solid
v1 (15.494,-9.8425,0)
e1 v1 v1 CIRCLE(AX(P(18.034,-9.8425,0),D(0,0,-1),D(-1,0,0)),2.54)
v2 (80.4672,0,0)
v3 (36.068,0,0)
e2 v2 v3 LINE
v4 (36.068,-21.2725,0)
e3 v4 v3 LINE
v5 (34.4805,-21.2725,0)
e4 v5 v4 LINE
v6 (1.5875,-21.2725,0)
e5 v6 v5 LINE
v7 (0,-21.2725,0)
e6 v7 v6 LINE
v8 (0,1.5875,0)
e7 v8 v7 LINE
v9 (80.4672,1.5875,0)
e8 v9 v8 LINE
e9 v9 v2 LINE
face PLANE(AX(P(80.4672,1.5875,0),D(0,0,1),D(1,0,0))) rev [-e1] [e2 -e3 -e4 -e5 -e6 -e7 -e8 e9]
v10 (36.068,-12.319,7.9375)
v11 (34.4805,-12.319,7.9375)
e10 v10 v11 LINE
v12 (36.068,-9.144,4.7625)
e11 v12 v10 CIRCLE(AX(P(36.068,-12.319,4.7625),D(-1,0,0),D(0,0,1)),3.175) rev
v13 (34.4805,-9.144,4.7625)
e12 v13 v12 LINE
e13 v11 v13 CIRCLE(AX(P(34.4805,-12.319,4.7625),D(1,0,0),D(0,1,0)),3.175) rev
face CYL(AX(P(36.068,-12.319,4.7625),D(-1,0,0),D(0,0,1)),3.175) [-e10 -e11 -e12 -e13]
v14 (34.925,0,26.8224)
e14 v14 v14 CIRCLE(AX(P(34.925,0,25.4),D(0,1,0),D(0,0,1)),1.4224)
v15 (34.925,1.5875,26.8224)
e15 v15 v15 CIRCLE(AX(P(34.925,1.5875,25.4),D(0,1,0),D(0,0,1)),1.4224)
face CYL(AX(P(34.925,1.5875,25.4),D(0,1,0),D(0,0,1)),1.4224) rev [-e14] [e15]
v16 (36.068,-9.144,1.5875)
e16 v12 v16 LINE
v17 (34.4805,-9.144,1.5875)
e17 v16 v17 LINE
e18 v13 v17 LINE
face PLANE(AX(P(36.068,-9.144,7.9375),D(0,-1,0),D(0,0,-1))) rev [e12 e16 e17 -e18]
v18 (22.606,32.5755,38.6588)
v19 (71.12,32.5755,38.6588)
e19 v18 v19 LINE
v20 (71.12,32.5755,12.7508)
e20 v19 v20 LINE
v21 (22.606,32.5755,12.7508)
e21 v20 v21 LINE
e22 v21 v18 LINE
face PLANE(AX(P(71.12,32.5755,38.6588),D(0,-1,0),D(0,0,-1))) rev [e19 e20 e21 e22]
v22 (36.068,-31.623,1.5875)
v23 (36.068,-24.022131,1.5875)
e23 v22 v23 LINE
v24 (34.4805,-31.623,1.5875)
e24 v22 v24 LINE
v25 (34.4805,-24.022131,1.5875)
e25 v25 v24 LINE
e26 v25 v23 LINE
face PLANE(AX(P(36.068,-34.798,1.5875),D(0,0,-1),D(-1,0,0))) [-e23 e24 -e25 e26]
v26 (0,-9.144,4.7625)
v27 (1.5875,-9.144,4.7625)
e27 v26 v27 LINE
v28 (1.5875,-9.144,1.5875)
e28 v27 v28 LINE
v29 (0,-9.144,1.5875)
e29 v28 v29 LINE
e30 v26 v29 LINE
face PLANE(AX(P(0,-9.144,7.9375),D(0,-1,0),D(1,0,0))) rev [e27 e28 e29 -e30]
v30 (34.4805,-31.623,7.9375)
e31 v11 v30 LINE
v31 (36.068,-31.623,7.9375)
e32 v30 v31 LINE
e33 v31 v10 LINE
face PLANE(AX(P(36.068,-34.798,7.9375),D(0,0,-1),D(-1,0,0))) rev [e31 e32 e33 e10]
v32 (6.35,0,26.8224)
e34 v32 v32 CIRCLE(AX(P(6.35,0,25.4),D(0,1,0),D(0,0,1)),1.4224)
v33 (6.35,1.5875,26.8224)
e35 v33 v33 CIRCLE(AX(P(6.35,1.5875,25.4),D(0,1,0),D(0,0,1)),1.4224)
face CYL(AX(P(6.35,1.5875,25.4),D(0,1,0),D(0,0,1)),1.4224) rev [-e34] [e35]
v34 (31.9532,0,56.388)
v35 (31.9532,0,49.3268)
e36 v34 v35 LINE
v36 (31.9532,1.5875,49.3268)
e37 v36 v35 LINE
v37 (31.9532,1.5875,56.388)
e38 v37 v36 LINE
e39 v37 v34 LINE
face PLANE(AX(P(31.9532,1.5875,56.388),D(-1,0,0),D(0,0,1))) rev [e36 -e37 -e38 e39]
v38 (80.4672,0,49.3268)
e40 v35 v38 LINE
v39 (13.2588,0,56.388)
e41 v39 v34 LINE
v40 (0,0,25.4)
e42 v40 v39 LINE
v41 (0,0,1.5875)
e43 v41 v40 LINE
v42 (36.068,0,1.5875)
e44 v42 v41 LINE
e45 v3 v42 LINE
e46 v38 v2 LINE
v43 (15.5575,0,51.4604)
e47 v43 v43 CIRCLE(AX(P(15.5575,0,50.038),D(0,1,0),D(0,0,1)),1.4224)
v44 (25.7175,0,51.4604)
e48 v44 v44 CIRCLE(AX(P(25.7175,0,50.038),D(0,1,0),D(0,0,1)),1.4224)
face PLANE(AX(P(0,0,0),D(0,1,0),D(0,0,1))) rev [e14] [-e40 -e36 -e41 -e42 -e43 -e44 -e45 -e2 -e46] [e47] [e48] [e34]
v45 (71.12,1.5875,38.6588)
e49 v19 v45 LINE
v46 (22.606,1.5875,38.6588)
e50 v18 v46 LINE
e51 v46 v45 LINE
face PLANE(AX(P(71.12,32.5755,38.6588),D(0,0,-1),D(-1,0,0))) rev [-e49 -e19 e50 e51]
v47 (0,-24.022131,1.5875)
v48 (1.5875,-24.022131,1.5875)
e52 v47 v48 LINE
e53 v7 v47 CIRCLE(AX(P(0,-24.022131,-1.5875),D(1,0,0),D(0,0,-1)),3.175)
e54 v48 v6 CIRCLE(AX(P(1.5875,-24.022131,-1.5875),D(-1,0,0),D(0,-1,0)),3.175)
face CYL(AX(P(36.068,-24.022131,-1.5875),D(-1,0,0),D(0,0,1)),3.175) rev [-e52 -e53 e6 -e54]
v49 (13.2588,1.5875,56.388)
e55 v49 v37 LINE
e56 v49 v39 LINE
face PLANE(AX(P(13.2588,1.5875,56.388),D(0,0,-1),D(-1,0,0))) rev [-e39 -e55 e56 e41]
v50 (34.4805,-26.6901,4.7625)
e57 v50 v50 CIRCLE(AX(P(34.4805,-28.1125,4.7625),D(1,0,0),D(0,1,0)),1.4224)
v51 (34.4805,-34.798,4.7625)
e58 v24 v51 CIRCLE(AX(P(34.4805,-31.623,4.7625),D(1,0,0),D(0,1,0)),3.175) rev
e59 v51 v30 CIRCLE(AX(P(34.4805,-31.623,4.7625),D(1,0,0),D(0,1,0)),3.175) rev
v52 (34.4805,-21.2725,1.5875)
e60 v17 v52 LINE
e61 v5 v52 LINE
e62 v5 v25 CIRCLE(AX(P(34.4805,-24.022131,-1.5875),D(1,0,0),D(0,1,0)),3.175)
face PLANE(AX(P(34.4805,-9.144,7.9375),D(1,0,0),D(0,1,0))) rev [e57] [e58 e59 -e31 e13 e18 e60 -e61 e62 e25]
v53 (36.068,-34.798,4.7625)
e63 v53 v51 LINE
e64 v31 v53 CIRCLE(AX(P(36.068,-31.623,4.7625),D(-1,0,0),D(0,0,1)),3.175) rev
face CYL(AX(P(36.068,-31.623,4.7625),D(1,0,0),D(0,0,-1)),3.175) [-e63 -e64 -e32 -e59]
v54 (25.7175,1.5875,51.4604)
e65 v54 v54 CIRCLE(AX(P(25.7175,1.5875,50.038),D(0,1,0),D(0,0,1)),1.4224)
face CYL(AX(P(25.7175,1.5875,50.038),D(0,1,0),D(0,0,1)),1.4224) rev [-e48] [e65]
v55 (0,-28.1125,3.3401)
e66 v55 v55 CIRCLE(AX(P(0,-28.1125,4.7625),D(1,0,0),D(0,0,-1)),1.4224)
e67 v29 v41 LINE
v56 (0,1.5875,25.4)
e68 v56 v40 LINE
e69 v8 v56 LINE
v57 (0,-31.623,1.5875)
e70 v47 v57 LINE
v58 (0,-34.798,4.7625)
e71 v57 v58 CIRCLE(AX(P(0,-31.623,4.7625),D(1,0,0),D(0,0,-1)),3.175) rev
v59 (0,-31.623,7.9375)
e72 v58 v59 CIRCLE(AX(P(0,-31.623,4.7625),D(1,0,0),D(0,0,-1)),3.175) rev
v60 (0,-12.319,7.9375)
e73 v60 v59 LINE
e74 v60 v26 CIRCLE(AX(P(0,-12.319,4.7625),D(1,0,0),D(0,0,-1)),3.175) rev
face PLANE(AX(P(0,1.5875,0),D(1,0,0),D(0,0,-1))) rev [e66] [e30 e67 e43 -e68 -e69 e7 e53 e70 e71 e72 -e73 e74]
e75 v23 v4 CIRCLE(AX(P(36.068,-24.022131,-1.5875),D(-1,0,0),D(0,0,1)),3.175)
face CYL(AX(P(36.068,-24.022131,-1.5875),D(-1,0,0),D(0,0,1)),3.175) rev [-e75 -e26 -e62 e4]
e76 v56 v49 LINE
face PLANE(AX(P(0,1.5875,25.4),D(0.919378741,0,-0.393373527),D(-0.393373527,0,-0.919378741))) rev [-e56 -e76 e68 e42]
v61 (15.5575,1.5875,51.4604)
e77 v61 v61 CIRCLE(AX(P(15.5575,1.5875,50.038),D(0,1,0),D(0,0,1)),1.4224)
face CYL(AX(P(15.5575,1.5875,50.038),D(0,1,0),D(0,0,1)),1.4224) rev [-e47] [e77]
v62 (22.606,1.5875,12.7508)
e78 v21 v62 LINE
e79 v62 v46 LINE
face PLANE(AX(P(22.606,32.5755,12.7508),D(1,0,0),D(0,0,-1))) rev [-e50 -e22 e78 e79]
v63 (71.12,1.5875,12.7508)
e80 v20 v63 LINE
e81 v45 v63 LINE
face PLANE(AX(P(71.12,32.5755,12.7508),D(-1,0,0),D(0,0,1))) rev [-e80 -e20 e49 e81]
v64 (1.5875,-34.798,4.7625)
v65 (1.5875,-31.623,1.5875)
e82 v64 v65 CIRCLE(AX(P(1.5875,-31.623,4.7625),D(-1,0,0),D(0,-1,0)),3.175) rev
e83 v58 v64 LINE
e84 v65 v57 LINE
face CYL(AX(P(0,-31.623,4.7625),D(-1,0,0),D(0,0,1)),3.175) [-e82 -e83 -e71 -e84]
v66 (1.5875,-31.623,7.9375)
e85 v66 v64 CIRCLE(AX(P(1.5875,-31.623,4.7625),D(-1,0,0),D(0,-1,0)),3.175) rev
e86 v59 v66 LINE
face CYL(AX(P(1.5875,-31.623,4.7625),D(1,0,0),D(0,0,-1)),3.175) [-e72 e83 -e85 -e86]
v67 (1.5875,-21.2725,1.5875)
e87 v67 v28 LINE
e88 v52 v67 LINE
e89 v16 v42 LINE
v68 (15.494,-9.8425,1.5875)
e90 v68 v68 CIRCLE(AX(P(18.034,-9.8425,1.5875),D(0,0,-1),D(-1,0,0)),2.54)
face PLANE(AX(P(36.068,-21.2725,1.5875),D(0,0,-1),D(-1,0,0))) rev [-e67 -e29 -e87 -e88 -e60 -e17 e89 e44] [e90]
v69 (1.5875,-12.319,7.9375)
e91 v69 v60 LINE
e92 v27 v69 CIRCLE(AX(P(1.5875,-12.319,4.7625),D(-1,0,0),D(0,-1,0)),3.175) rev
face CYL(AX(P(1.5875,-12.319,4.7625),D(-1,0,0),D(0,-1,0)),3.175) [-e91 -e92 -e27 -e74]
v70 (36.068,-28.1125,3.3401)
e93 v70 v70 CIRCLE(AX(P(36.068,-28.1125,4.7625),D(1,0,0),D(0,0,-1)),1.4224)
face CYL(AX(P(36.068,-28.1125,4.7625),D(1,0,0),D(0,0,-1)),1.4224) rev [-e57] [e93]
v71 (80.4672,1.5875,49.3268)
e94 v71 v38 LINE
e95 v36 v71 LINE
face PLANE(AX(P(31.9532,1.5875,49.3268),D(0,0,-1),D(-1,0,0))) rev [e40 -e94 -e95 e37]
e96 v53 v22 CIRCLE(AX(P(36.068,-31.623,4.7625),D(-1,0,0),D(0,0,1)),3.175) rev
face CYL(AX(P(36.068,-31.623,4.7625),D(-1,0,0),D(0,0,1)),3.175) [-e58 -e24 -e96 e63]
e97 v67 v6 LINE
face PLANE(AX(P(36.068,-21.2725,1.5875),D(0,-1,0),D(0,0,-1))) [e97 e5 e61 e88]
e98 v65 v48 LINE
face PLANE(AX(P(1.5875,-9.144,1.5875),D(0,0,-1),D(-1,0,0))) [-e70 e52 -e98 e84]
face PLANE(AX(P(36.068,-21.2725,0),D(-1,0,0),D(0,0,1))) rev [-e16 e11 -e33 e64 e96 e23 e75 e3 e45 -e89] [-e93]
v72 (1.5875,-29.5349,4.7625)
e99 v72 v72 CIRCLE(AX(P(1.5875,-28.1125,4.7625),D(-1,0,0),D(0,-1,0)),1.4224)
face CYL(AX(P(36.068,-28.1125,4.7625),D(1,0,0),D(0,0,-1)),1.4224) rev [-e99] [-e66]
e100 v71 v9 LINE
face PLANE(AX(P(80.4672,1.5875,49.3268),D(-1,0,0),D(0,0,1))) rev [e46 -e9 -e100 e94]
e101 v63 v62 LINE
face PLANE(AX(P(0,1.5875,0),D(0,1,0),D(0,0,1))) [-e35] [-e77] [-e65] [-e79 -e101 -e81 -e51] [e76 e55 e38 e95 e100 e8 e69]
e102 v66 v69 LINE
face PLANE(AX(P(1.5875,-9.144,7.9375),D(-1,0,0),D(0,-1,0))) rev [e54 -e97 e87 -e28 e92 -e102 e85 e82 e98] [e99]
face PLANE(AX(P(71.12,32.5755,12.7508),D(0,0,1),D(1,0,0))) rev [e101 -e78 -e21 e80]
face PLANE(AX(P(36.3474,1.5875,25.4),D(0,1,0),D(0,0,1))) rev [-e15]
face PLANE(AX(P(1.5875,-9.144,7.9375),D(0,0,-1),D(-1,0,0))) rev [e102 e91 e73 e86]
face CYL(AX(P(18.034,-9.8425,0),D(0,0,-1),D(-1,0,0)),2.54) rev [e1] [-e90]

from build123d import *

# Parameters (mm, degrees)
BOSS_EXTRUDE1_DEPTH = 1.5875
SKETCH2_W           = 36.068
SKETCH2_H           = 1.5875
BOSS_EXTRUDE2_DEPTH = 21.2725
SKETCH3_W           = 1.5875
SKETCH3_H           = 25.654
BOSS_EXTRUDE3_DEPTH = 6.35
FILLET1_R           = 3.175
HOLE1_D             = 5.08
HOLE1_DEPTH         = 15.875
HOLE2_D             = 2.8448
SKETCH9_W           = 48.514
SKETCH9_H           = 25.908
BOSS_EXTRUDE4_DEPTH = 30.988
HOLE3_D             = 2.8448
LPATTERN1_COUNT     = 2
LPATTERN1_PITCH     = 10.16
SKETCH12_W          = 1.4224
SKETCH12_H          = 36.3855
LPATTERN2_COUNT     = 2
LPATTERN2_PITCH     = 28.575


with BuildPart() as part:
    # Sketch1 → Boss-Extrude1 (new body)
    with BuildSketch(Plane(origin=(0, 0, 0), x_dir=(1, 0, 0), z_dir=(0, 1, 0))):
        Polygon((0, 0), (0, -25.4), (13.2588, -56.388), (31.9532, -56.388), (31.9532, -49.3268), (80.4672, -49.3268), (80.4672, 0), align=None)
    extrude(amount=BOSS_EXTRUDE1_DEPTH)

    # Sketch2 → Boss-Extrude2 (add)
    with BuildSketch(Plane.XZ):
        with Locations((18.034, 0.79375)):
            Rectangle(SKETCH2_W, SKETCH2_H)
    extrude(amount=BOSS_EXTRUDE2_DEPTH)

    # Sketch3 → Boss-Extrude3 (add)
    with BuildSketch(Plane.XY.offset(1.5875)):
        with Locations((35.27425, -21.971)):
            Rectangle(SKETCH3_W, SKETCH3_H)
        with Locations((0.79375, -21.971)):
            Rectangle(SKETCH3_W, SKETCH3_H)
    extrude(amount=BOSS_EXTRUDE3_DEPTH)

    # Fillet1
    # the kernel refuses this fillet: 3.175 mm, written as the material it adds along each edge
    with BuildSketch(Plane(origin=(34.4805, -21.2725, 1.5875), x_dir=(0, 0, -1), z_dir=(1, 0, 0)), Plane(origin=(0, -21.2725, 1.5875), x_dir=(0, 0, -1), z_dir=(1, 0, 0))) as fillet1_piece_1:
        with BuildLine():
            CenterArc((3.175, -2.749630657), FILLET1_R, 120, 60)
            Line((0, -2.749630657), (0, 0))
            Line((0, 0), (1.5875, 0))
        make_face()
    extrude(amount=1.5875)
    # the kernel refuses this fillet: 3.175 mm, written as the material it takes off along each edge
    with BuildSketch(Plane(origin=(26.543, -34.798, 1.5875), x_dir=(0, 1, 0), z_dir=(1, 0, 0)), Plane(origin=(44.0055, -9.144, 7.9375), x_dir=(0, 0, -1), z_dir=(-1, 0, 0)), Plane(origin=(9.525, -34.798, 1.5875), x_dir=(0, 0, 1), z_dir=(-1, 0, 0)), Plane(origin=(9.525, -34.798, 7.9375), x_dir=(0, 1, 0), z_dir=(-1, 0, 0))) as fillet1_2_piece_1:
        with BuildLine():
            CenterArc((FILLET1_R, FILLET1_R), FILLET1_R, 180, 90)
            Line((0, FILLET1_R), (0, 0))
            Line((0, 0), (FILLET1_R, 0))
        make_face()
    extrude(amount=17.4625, mode=Mode.SUBTRACT)
    with BuildSketch(Plane(origin=(26.543, -34.798, 7.9375), x_dir=(0, 1, 0), z_dir=(1, 0, 0)), Plane(origin=(-7.9375, -9.144, 7.9375), x_dir=(0, 0, -1), z_dir=(1, 0, 0))) as fillet1_2_piece_2:
        with BuildLine():
            CenterArc((FILLET1_R, -FILLET1_R), FILLET1_R, 90, 90)
            Line((0, -FILLET1_R), (0, 0))
            Line((0, 0), (FILLET1_R, 0))
        make_face()
    extrude(amount=17.4625, mode=Mode.SUBTRACT)

    # Hole1
    with Locations(Plane(origin=(0, 0, 0), x_dir=(-1, 0, 0), z_dir=(0, 0, -1))):
        with Locations((-18.034, -9.8425)):
            Hole(HOLE1_D / 2, depth=HOLE1_DEPTH)

    # Hole2 (through all)
    with Locations(Plane(origin=(36.068, 3.937526914, -1.455484635), x_dir=(0, 0, -1), z_dir=(1, 0, 0))):
        with Locations((-6.217984635, -32.050026914)):
            Hole(HOLE2_D / 2)

    # Sketch9 → Boss-Extrude4 (add)
    with BuildSketch(Plane(origin=(0, 1.5875, 0), x_dir=(1, 0, 0), z_dir=(0, 1, 0))):
        with Locations((46.863, -25.7048)):
            Rectangle(SKETCH9_W, SKETCH9_H)
    extrude(amount=BOSS_EXTRUDE4_DEPTH)

    # Hole3 (through all)
    with Locations(Plane(origin=(0, 1.5875, 0), x_dir=(-1, 0, 0), z_dir=(0, 1, 0))):
        with Locations((-25.7175, 50.038)):
            hole3 = Hole(HOLE3_D / 2)

    # LPattern1: Hole3 ×2
    with Locations(*[(-i * LPATTERN1_PITCH, 0, 0) for i in range(1, LPATTERN1_COUNT)]):
        add(hole3, mode=Mode.SUBTRACT)

    # Sketch12 → Hole4 (revolve, cut)
    with BuildSketch(Plane(origin=(6.35, 1.5875, 25.4), x_dir=(0, 0, 1), z_dir=(1, 0, 0))):
        with Locations((0.7112, 18.19275)):
            Rectangle(SKETCH12_W, SKETCH12_H)
    hole4 = revolve(axis=Axis((6.35, -108.4125, 25.4), (0, 1, 0)), mode=Mode.SUBTRACT)

    # LPattern2: Hole4 ×2
    with Locations(*[(i * LPATTERN2_PITCH, 0, 0) for i in range(1, LPATTERN2_COUNT)]):
        add(hole4, mode=Mode.SUBTRACT)


solid = part.part
